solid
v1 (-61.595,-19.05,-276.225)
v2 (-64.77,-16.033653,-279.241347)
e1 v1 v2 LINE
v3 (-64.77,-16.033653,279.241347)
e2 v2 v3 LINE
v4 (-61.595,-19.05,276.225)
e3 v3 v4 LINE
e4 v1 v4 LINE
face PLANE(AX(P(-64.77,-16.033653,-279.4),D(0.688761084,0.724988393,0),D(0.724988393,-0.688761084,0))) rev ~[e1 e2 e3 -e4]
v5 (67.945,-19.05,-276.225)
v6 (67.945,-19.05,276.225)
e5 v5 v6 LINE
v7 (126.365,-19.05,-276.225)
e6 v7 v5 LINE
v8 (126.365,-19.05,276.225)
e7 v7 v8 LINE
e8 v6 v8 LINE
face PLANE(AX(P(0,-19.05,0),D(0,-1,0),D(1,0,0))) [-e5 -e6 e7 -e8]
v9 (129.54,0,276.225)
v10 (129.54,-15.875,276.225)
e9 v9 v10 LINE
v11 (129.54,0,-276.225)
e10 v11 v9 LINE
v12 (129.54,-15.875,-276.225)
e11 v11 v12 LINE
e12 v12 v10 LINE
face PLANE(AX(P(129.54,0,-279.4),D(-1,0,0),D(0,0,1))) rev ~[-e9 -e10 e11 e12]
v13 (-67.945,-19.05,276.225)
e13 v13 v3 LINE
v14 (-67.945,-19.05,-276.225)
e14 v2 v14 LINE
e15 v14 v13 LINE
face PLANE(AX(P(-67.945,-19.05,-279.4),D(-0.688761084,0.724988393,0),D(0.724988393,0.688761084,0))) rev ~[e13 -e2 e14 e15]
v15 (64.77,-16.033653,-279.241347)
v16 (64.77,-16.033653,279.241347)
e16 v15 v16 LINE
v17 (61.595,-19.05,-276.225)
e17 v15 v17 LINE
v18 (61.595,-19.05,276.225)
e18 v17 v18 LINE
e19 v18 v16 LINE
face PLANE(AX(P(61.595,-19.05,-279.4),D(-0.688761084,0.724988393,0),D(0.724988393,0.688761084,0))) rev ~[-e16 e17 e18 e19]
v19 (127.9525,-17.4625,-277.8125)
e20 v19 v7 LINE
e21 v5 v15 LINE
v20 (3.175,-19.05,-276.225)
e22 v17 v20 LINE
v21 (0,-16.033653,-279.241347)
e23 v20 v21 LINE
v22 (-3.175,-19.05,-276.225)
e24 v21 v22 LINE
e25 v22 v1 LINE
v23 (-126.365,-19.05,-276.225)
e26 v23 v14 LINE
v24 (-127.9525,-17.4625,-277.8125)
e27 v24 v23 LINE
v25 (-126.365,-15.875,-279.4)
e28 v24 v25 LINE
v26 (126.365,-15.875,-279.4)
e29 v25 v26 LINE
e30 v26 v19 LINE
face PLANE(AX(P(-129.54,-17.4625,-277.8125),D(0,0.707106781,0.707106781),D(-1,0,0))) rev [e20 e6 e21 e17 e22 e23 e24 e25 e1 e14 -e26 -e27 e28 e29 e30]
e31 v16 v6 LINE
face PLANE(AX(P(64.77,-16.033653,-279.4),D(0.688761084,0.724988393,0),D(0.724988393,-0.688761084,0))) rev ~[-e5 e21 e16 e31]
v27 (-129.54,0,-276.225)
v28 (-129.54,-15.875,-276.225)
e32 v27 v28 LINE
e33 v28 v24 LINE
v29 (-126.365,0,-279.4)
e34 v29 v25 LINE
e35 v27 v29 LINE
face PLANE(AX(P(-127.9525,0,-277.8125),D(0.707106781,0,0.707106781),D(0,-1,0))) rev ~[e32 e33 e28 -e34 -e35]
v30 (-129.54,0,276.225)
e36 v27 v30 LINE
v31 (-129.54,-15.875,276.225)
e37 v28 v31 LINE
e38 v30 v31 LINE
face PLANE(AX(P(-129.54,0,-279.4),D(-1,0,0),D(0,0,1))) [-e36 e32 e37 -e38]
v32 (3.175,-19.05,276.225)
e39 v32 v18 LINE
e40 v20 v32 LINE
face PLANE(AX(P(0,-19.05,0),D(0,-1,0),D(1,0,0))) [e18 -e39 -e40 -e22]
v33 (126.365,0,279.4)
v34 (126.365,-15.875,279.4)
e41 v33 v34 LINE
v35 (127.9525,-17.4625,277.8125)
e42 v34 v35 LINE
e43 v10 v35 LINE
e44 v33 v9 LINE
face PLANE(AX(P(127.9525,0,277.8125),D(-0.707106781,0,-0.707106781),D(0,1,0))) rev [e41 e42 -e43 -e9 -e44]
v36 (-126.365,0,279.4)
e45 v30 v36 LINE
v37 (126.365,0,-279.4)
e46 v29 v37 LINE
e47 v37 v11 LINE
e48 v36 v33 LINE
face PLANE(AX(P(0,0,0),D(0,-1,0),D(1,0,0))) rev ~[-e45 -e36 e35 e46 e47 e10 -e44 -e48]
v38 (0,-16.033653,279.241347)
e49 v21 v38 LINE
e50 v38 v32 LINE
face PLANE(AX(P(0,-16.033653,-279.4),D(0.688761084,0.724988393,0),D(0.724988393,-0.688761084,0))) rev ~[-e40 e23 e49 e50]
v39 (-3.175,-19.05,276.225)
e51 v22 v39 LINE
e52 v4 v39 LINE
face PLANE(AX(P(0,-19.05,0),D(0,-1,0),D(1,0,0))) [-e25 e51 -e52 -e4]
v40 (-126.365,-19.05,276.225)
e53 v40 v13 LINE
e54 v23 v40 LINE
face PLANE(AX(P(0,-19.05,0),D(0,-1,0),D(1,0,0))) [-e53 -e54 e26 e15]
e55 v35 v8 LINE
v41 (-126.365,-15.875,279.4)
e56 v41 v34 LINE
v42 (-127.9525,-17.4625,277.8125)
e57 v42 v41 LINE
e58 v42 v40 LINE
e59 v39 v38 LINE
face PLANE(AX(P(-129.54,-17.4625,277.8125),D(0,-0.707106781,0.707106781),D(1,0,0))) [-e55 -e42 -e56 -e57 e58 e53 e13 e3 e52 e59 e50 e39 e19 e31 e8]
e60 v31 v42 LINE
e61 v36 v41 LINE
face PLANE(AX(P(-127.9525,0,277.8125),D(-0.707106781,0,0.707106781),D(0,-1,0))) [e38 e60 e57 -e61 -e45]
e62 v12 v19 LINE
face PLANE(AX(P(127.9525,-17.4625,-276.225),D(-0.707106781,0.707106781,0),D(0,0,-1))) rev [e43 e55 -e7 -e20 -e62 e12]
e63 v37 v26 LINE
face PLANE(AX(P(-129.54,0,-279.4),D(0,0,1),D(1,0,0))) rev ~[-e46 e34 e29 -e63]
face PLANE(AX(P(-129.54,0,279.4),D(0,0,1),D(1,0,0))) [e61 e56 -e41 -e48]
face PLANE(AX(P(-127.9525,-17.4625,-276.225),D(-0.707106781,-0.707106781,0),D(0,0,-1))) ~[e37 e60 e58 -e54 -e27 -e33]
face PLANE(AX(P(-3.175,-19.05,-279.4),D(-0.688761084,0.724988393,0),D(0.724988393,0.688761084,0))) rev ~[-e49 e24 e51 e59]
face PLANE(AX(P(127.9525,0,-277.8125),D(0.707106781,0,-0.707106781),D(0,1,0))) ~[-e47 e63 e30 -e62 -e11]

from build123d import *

# Parameters (mm, degrees)
F0_W       = 259.08
F0_H       = 558.8
F1_DEPTH   = 19.05
F3_DEPTH   = 558.801
F4_C1_SIZE = 3.175
F4_C2_SIZE = 3.175
F4_C3_SIZE = 3.175
F5_SIZE    = 3.175
F6_SIZE    = 3.175


# Not quite as in the source:
# - a feature names something its author has since deleted; it is built from what else it names


with BuildPart() as f1:
    # F0 (on Front) → F1 (new body)
    with BuildSketch(Plane.XZ):
        Rectangle(F0_W, F0_H)
    extrude(amount=F1_DEPTH)

    # F2 (on face) → F3 (cut, through all)
    with BuildSketch(Plane(origin=(0, 0, -279.4), x_dir=(1, 0, 0), z_dir=(0, 0, -1))):
        Polygon((-64.77, 19.05), (-67.945, 19.05), (-64.77, 16.0336531699), (-61.595, 19.05), align=None)
        Polygon((0, 16.0336531699), (3.175, 19.05), (0, 19.05), (-3.175, 19.05), align=None)
        Polygon((64.77, 16.0336531699), (67.945, 19.05), (64.77, 19.05), (61.595, 19.05), align=None)
    extrude(amount=-F3_DEPTH, mode=Mode.SUBTRACT)

    # F4: chamfer of 3.175 on 4 edges, made by hand

    # F4_c1
    f4_c1_edges = [f1.edges().sort_by_distance(p)[0] for p in [
        (-98.7425, -19.05, -279.4),
    ]]
    chamfer(f4_c1_edges, length=F4_C1_SIZE)

    # F4_c2
    f4_c2_edges = [f1.edges().sort_by_distance(p)[0] for p in [
        (-98.7425, -19.05, 279.4),
    ]]
    chamfer(f4_c2_edges, length=F4_C2_SIZE)

    # F4_c3
    f4_c3_edges = [f1.edges().sort_by_distance(p)[0] for p in [
        (-129.54, -19.05, 0),
    ]]
    chamfer(f4_c3_edges, length=F4_C3_SIZE)

    # F5
    f5_edges = [f1.edges().sort_by_distance(p)[0] for p in [
        (-129.54, -7.9375, 279.4),
        (129.54, -7.9375, 279.4),
        (129.54, -7.9375, -279.4),
        (-129.54, -7.9375, -279.4),
    ]]
    chamfer(f5_edges, length=F5_SIZE)

    # F6
    f6_edges = [f1.edges().sort_by_distance(p)[0] for p in [
        (129.54, -19.05, 0),
    ]]
    chamfer(f6_edges, length=F6_SIZE)


solid = f1.part
